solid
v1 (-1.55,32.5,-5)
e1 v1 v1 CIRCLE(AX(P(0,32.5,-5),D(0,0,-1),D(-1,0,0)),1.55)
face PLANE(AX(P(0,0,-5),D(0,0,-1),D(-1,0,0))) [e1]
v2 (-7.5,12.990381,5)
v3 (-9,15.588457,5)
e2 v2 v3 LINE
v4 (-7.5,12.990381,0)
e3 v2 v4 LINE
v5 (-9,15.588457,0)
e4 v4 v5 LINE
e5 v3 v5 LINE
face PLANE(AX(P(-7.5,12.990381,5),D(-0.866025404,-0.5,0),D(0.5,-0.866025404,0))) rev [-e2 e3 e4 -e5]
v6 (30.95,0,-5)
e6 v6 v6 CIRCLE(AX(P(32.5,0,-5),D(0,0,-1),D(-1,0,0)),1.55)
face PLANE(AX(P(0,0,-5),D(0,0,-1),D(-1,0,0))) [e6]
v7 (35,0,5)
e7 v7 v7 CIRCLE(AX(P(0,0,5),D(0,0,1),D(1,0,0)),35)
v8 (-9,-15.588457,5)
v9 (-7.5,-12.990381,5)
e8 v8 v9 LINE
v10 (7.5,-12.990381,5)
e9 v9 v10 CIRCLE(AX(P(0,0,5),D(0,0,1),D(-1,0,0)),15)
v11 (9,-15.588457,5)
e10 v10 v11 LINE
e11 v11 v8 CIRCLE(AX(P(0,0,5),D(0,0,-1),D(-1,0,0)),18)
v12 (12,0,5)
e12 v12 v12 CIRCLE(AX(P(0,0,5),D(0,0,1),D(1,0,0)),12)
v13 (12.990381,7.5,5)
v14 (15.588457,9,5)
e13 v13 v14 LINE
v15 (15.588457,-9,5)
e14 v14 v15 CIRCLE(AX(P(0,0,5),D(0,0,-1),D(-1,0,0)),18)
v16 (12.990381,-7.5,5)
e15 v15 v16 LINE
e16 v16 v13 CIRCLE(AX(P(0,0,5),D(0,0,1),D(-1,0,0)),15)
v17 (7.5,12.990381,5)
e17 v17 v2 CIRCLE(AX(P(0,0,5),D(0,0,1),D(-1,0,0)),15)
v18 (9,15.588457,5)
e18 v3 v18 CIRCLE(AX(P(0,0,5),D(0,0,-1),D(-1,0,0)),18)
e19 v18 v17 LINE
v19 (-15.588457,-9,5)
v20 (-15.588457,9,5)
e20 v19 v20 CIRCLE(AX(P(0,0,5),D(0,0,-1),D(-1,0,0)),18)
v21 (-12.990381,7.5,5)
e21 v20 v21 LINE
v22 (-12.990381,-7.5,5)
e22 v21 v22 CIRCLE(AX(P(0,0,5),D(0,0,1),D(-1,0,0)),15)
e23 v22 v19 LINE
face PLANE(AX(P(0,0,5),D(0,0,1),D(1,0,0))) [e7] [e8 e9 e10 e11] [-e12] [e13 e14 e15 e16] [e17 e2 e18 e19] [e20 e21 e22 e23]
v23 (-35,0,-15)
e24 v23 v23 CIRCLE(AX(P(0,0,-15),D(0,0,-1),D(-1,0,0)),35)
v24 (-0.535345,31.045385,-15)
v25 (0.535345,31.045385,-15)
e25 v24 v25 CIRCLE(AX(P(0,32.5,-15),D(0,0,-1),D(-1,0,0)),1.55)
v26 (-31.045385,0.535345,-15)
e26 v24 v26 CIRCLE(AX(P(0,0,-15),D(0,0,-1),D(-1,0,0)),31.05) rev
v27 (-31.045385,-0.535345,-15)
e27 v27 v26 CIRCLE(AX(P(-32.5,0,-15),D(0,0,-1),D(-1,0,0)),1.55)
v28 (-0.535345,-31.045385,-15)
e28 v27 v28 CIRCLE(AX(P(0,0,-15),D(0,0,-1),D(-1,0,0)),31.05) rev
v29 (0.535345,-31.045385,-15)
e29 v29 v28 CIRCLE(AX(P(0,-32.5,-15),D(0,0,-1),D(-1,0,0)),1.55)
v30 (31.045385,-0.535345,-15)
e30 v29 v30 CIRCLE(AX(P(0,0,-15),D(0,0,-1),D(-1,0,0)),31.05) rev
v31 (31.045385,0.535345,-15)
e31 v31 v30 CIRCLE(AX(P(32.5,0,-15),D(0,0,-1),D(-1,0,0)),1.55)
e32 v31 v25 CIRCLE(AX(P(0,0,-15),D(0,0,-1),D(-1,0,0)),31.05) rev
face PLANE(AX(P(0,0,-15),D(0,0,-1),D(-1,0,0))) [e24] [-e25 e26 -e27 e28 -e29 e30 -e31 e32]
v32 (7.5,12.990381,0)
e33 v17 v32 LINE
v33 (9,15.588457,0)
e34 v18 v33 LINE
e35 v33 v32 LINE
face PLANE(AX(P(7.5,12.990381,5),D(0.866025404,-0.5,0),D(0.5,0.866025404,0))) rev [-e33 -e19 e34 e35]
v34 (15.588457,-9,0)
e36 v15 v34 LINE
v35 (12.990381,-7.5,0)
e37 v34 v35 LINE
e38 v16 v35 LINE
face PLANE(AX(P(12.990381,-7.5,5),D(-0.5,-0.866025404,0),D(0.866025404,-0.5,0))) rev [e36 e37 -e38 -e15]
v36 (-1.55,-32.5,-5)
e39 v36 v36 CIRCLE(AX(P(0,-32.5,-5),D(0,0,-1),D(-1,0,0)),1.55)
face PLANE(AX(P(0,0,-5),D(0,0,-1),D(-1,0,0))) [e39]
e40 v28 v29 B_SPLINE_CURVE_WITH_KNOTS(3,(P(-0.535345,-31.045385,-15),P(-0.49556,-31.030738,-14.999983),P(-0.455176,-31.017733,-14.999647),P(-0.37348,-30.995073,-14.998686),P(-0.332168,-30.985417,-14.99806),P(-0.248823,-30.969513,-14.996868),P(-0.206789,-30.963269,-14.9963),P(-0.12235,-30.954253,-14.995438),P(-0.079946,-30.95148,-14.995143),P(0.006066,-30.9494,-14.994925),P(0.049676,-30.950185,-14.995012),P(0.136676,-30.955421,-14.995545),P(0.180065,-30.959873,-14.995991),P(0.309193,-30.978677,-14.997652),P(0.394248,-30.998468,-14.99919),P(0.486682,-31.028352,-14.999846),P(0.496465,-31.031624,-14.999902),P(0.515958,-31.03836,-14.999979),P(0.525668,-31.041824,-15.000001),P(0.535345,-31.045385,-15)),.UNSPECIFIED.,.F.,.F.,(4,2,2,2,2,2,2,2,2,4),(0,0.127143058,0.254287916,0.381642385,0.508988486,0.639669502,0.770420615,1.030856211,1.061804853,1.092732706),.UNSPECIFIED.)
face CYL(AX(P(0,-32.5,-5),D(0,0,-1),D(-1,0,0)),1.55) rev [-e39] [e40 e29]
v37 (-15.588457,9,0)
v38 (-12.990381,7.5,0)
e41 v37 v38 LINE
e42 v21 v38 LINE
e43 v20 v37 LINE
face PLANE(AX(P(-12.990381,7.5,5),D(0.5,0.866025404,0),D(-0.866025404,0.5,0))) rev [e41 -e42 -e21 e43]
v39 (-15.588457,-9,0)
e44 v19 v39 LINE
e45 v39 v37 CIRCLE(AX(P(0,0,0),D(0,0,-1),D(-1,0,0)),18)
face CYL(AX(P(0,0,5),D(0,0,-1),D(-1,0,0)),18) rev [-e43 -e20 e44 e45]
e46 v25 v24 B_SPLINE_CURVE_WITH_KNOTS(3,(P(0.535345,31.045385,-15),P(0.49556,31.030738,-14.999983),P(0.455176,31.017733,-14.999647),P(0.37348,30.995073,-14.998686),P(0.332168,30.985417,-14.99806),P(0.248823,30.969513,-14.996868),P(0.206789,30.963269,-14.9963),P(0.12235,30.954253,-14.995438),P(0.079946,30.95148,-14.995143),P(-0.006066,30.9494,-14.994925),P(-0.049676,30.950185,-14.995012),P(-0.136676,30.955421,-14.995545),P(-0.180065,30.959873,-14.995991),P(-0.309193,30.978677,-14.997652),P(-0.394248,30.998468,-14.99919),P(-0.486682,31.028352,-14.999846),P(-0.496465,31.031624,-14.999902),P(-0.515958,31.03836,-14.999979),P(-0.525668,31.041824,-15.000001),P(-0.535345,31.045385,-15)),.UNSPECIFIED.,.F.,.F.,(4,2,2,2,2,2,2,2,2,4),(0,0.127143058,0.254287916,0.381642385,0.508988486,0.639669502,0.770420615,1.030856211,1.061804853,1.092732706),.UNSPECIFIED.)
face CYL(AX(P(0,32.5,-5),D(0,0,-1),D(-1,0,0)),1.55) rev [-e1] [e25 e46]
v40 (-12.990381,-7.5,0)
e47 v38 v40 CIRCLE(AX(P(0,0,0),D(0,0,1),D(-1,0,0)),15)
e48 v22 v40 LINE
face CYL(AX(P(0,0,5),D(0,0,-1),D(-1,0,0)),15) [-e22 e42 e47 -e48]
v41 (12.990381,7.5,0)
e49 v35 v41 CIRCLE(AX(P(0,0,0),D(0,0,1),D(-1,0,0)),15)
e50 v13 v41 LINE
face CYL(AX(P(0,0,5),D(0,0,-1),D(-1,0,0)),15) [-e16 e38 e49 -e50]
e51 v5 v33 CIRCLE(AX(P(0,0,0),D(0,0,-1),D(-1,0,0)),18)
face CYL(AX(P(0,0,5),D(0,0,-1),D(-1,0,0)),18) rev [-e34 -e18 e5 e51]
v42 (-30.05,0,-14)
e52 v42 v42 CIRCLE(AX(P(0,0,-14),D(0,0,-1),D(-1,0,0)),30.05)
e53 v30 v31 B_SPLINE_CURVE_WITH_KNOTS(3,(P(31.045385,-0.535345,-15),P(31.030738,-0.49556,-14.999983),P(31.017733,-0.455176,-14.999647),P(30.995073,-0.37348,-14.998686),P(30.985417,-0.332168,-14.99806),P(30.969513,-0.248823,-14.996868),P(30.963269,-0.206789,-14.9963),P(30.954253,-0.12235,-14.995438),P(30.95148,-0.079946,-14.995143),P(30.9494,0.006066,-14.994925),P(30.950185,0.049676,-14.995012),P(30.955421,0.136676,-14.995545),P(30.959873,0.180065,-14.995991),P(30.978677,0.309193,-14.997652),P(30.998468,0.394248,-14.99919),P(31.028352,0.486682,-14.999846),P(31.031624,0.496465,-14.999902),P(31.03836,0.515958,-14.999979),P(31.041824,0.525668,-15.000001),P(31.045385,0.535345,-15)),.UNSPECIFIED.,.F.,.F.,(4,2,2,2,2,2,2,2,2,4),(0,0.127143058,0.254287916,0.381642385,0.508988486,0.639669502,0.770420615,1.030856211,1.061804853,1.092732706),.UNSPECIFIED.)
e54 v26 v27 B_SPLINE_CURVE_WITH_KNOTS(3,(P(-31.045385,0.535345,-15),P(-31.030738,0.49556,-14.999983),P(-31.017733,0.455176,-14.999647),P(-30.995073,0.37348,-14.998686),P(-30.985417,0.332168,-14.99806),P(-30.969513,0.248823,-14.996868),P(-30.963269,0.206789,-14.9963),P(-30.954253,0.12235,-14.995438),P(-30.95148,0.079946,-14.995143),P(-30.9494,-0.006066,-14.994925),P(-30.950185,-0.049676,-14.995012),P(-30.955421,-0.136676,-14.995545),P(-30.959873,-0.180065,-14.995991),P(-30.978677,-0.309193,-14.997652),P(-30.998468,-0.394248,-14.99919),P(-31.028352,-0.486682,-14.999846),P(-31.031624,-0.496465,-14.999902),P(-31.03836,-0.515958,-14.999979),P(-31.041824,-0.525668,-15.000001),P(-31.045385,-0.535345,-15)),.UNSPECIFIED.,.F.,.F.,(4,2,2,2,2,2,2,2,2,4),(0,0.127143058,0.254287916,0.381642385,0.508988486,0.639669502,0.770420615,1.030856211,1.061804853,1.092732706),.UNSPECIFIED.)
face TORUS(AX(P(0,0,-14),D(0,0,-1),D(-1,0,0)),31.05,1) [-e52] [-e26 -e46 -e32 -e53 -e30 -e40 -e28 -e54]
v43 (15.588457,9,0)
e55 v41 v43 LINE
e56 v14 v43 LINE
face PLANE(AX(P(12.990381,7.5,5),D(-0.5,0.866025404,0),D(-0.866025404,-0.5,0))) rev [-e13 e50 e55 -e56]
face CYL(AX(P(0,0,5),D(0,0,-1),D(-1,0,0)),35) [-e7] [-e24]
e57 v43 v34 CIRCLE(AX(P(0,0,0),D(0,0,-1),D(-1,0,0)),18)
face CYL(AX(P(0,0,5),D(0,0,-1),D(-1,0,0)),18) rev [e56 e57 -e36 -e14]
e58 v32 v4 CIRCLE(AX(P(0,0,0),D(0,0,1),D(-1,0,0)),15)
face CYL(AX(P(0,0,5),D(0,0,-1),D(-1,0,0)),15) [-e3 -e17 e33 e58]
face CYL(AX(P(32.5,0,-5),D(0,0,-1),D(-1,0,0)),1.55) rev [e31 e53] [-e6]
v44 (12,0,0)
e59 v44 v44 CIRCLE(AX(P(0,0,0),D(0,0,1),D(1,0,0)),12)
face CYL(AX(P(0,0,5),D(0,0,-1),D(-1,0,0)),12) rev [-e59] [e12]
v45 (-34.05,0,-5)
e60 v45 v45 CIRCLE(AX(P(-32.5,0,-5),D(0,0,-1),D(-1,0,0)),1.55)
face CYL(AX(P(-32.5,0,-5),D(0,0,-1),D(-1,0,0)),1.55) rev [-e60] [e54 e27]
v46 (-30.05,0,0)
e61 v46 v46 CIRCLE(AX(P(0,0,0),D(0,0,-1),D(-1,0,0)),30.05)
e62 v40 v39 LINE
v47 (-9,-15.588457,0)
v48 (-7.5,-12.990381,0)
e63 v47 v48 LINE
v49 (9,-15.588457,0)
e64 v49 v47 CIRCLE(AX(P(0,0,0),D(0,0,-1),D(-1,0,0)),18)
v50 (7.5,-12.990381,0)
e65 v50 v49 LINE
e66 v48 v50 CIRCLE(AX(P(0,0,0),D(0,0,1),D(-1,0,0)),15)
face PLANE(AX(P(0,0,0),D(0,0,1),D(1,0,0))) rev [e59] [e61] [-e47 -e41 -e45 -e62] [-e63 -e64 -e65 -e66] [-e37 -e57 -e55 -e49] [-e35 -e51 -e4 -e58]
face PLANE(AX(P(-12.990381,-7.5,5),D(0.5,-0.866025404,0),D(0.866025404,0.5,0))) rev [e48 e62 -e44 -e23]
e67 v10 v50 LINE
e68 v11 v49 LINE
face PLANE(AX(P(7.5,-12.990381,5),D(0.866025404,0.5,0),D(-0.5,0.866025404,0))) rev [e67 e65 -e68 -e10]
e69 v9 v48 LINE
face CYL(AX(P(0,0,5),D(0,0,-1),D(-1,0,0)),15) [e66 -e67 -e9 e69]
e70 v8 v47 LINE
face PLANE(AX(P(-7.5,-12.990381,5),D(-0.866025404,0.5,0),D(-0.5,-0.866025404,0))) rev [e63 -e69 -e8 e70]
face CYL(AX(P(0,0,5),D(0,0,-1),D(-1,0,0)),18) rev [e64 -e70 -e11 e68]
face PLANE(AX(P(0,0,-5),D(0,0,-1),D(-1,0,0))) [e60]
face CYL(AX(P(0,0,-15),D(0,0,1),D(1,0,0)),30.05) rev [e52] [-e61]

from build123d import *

# Parameters (mm, degrees)
SKETCH_2_R          = 35
SKETCH_2_R_2        = 12
EXTRUDE_1_DEPTH     = 5
EXTRUDE_START       = 15
SKETCH_3_R          = 35
SKETCH_3_R_2        = 30.05
EXTRUDE_2_DEPTH     = 15
SKETCH_4_R          = 1.55
CUT_EXTRUDE_1_DEPTH = 10
FILLET_1_R          = 1
CUT_EXTRUDE_2_DEPTH = 52.720402193


with BuildPart() as part:
    # 草图2 → 凸台-拉伸1 (new body)
    with BuildSketch(Plane.XY):
        Circle(SKETCH_2_R)
        Circle(SKETCH_2_R_2, mode=Mode.SUBTRACT)
    extrude(amount=EXTRUDE_1_DEPTH)

    # 草图3 → 凸台-拉伸2 (add)
    with BuildSketch(Plane(origin=(0, 0, 0), x_dir=(-1, 0, 0), z_dir=(0, 0, -1)).offset(EXTRUDE_START)):
        Circle(SKETCH_3_R)
        Circle(SKETCH_3_R_2, mode=Mode.SUBTRACT)
    extrude(amount=-EXTRUDE_2_DEPTH)

    # 草图4 → 切除-拉伸1 (cut)
    with BuildSketch(Plane(origin=(0, 0, -15), x_dir=(-1, 0, 0), z_dir=(0, 0, -1))):
        with Locations((0, 32.5)):
            Circle(SKETCH_4_R)
        with Locations((32.5, 0)):
            Circle(SKETCH_4_R)
        with Locations((0, -32.5)):
            Circle(SKETCH_4_R)
        with Locations((-32.5, 0)):
            Circle(SKETCH_4_R)
    extrude(amount=-CUT_EXTRUDE_1_DEPTH, mode=Mode.SUBTRACT)

    # 圆角1
    # the kernel refuses this fillet: 1 mm, written as the material it takes off along each edge
    with BuildSketch(Plane(origin=(0, 0, -15), x_dir=(-1, 0, 0), z_dir=(0, -1, 0))) as fillet_1_piece_1:
        with BuildLine():
            CenterArc((30.05 + FILLET_1_R, -FILLET_1_R), FILLET_1_R, 90, 90)
            Line((30.05, -FILLET_1_R), (30.05, 0))
            Line((30.05, 0), (30.05 + FILLET_1_R, 0))
        make_face()
    revolve(axis=Axis((0, 0, -15), (0, 0, -1)), mode=Mode.SUBTRACT)

    # 草图5 → 切除-拉伸2 (cut, through all)
    with BuildSketch(Plane(origin=(0, 0, 0), x_dir=(-1, 0, 0), z_dir=(0, 0, -1))):
        with BuildLine():
            Line((12.990381057, -7.5), (15.588457268, -9))
            ThreePointArc((15.588457268, -9), (18, 0), (15.588457268, 9))
            Line((15.588457268, 9), (12.990381057, 7.5))
            ThreePointArc((12.990381057, 7.5), (15, 0), (12.990381057, -7.5))
        make_face()
        with BuildLine():
            Line((-7.5, 12.990381057), (-9, 15.588457268))
            ThreePointArc((-9, 15.588457268), (0, 18), (9, 15.588457268))
            Line((9, 15.588457268), (7.5, 12.990381057))
            ThreePointArc((7.5, 12.990381057), (0, 15), (-7.5, 12.990381057))
        make_face()
        with BuildLine():
            Line((-7.5, -12.990381057), (-9, -15.588457268))
            ThreePointArc((-9, -15.588457268), (0, -18), (9, -15.588457268))
            Line((9, -15.588457268), (7.5, -12.990381057))
            ThreePointArc((7.5, -12.990381057), (0, -15), (-7.5, -12.990381057))
        make_face()
        with BuildLine():
            Line((-12.990381057, 7.5), (-15.588457268, 9))
            ThreePointArc((-15.588457268, 9), (-18, 0), (-15.588457268, -9))
            Line((-15.588457268, -9), (-12.990381057, -7.5))
            ThreePointArc((-12.990381057, -7.5), (-15, 0), (-12.990381057, 7.5))
        make_face()
    extrude(amount=-CUT_EXTRUDE_2_DEPTH, mode=Mode.SUBTRACT)


solid = part.part
